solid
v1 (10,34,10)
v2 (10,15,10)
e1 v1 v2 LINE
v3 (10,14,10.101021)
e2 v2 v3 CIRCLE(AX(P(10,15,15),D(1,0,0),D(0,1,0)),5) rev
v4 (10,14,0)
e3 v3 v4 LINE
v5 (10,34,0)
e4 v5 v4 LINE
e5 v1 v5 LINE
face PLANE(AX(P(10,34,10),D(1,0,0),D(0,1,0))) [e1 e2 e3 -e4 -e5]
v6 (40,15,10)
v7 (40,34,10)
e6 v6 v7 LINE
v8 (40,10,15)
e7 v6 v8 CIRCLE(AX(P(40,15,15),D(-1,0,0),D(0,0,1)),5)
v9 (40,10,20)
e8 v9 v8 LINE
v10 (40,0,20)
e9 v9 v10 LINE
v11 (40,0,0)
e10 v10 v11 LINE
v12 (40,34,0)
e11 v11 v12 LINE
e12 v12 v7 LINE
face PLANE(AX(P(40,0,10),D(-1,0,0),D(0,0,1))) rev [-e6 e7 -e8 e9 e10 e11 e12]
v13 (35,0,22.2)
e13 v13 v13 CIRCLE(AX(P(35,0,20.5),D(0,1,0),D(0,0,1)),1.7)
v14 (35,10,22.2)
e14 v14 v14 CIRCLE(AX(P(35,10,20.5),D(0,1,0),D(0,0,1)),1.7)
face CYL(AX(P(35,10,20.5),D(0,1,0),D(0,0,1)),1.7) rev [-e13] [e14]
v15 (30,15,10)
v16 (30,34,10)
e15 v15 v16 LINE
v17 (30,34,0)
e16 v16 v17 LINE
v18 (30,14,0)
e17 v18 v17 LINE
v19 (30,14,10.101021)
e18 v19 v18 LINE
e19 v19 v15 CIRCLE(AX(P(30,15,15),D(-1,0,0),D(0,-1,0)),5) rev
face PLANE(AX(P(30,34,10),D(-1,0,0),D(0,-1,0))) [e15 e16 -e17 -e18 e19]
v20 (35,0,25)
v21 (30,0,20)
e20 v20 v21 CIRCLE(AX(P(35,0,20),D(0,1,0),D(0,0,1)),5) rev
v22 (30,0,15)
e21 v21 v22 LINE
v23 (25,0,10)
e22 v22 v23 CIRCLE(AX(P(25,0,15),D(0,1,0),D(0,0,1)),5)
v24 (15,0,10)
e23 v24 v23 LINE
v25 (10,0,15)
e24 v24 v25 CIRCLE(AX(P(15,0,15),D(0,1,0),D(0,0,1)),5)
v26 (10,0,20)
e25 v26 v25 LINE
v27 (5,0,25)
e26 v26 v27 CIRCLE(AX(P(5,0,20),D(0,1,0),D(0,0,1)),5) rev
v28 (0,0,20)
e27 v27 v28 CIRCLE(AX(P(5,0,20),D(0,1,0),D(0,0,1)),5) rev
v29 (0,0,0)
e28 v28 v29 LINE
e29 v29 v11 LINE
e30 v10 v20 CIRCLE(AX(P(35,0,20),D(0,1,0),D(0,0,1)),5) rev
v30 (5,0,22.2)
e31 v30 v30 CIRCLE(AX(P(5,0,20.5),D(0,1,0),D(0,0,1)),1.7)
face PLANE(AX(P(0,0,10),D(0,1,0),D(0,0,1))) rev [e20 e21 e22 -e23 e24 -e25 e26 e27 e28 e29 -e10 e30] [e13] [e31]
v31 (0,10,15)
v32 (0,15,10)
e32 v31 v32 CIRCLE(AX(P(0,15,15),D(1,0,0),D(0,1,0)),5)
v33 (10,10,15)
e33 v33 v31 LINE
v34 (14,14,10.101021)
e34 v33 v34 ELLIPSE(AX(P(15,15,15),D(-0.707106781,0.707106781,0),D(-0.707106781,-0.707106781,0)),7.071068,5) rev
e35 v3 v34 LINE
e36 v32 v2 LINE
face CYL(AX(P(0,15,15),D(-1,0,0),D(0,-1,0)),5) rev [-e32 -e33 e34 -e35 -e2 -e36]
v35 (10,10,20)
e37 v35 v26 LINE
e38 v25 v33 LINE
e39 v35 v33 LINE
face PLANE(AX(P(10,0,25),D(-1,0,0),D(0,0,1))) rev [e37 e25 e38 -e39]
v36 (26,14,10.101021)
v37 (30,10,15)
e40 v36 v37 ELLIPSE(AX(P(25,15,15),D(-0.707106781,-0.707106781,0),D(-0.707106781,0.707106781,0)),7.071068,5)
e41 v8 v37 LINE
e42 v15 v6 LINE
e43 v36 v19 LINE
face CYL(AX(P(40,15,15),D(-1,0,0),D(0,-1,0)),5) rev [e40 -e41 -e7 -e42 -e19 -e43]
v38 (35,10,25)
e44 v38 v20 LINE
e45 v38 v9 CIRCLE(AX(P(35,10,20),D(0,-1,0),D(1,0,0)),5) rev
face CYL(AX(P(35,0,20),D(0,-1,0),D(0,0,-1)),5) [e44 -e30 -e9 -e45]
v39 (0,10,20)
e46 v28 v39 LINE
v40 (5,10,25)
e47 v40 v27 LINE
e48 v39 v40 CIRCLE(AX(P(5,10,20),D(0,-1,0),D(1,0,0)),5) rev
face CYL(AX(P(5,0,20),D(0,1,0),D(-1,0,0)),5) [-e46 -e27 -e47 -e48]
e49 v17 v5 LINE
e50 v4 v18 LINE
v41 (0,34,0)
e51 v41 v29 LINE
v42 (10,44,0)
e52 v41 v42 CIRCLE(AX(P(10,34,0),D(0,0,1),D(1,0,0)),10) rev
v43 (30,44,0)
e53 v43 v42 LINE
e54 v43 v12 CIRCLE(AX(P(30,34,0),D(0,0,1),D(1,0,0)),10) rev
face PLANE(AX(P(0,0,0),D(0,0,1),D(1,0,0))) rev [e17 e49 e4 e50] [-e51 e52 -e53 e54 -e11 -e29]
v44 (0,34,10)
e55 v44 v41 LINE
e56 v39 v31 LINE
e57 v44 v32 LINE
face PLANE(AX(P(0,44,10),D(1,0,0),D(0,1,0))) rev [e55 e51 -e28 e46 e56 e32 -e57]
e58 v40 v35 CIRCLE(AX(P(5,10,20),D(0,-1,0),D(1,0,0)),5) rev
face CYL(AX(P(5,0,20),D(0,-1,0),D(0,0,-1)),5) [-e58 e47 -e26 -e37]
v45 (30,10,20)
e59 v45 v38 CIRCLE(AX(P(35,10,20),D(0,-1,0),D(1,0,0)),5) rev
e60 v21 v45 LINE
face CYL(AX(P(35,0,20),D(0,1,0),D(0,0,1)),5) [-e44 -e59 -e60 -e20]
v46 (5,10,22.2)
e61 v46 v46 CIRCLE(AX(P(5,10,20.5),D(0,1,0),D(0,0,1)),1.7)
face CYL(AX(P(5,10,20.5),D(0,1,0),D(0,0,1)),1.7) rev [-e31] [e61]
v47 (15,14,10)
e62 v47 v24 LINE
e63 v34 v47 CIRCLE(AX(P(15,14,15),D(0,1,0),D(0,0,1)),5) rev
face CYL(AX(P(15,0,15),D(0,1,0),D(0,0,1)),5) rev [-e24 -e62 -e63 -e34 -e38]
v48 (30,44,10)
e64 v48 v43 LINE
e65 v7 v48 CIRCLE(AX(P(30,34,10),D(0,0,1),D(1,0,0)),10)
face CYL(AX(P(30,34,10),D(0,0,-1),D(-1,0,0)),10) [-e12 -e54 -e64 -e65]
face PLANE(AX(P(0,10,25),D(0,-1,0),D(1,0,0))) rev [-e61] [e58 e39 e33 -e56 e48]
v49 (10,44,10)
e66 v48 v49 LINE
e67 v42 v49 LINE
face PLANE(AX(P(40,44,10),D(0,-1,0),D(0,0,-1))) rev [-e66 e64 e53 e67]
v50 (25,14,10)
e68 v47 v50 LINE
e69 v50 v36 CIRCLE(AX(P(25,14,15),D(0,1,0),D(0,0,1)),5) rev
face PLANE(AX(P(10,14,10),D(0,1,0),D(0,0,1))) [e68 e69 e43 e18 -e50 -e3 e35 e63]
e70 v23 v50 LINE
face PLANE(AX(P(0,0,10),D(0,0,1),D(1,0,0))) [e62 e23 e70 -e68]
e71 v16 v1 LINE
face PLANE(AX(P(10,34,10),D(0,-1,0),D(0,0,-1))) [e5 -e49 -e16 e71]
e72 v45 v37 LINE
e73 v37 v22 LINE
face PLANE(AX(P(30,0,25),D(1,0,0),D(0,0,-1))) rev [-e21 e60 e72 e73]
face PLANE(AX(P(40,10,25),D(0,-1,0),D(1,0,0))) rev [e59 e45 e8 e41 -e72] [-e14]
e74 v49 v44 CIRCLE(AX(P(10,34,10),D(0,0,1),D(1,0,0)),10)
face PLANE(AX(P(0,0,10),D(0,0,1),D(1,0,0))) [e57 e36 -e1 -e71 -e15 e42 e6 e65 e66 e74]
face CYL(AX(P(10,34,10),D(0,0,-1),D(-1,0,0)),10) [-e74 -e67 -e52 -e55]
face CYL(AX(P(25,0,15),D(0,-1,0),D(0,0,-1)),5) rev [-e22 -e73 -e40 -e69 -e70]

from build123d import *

# Parameters (mm, degrees)
ESQUISSE1_W        = 40
ESQUISSE1_H        = 44
ESQUISSE1_W_2      = 20
ESQUISSE1_H_2      = 20
BOSS_EXTRU_1_DEPTH = 10
ESQUISSE3_W        = 10
ESQUISSE3_H        = 10
BOSS_EXTRU_2_DEPTH = 15
D_GAGEMENT_M31_D   = 3.4
CONG_2_R           = 10
CONG_3_R           = 5


with BuildPart() as part:
    # Esquisse1 → Boss.-Extru.1 (new body)
    with BuildSketch(Plane.XY):
        with Locations((20, 22)):
            Rectangle(ESQUISSE1_W, ESQUISSE1_H)
        with Locations((20, 24)):
            Rectangle(ESQUISSE1_W_2, ESQUISSE1_H_2, mode=Mode.SUBTRACT)
    extrude(amount=BOSS_EXTRU_1_DEPTH)

    # Esquisse3 → Boss.-Extru.2 (add)
    with BuildSketch(Plane.XY.offset(10)):
        with Locations((35, 5)):
            Rectangle(ESQUISSE3_W, ESQUISSE3_H)
        with Locations((5, 5)):
            Rectangle(ESQUISSE3_W, ESQUISSE3_H)
    extrude(amount=BOSS_EXTRU_2_DEPTH)

    # Dégagement M31 (through all)
    with Locations(Plane(origin=(0, 10, 0), x_dir=(1, 0, 0), z_dir=(0, 1, 0))):
        with Locations((5, -20.5), (35, -20.5)):
            Hole(D_GAGEMENT_M31_D / 2)

    # Congé2
    cong_2_edges = [part.edges().sort_by_distance(p)[0] for p in [
        (0, 44, 5),
        (40, 44, 5),
    ]]
    fillet(cong_2_edges, radius=CONG_2_R)

    # Congé3
    # the kernel refuses this fillet: 5 mm, written as the material it adds along each edge
    with BuildSketch(Plane(origin=(40, 10, 10), x_dir=(0, 1, 0), z_dir=(-1, 0, 0)), Plane(origin=(30, 10, 10), x_dir=(-1, 0, 0), z_dir=(0, -1, 0))) as cong_3_piece_1:
        with BuildLine():
            CenterArc((CONG_3_R, -CONG_3_R), CONG_3_R, 90, 90)
            Line((0, -CONG_3_R), (0, 0))
            Line((0, 0), (CONG_3_R, 0))
        make_face()
    extrude(amount=10)
    with BuildSketch(Plane(origin=(0, 10, 10), x_dir=(0, 1, 0), z_dir=(1, 0, 0)), Plane(origin=(10, 10, 10), x_dir=(1, 0, 0), z_dir=(0, -1, 0))) as cong_3_piece_2:
        with BuildLine():
            CenterArc((CONG_3_R, CONG_3_R), CONG_3_R, 180, 90)
            Line((0, CONG_3_R), (0, 0))
            Line((0, 0), (CONG_3_R, 0))
        make_face()
    extrude(amount=10)
    with BuildSketch(Plane(origin=(30, 22.5, 10), x_dir=(-1, 0, 0), z_dir=(0, -1, 0))) as cong_3_piece_3a_section:
        with BuildLine():
            CenterArc((CONG_3_R, -CONG_3_R), CONG_3_R, 90, 90)
            Line((0, -CONG_3_R), (0, 0))
            Line((0, 0), (CONG_3_R, 0))
        make_face()
    cong_3_piece_3a = extrude(amount=22.5, mode=Mode.PRIVATE)
    cong_3_piece_3a = split(cong_3_piece_3a, bisect_by=Plane(origin=(28.868024429, 14, 11.131975571), z_dir=(0, -1, 0)), keep=Keep.TOP, mode=Mode.PRIVATE)
    cong_3_piece_3a = split(cong_3_piece_3a, bisect_by=Plane(origin=(28.868024429, 10, 11.131975571), z_dir=(0, 1, 0)), keep=Keep.TOP, mode=Mode.PRIVATE)
    with BuildSketch(Plane(origin=(40, 10, 10), x_dir=(0, 1, 0), z_dir=(-1, 0, 0))) as cong_3_piece_3b_section:
        with BuildLine():
            CenterArc((CONG_3_R, -CONG_3_R), CONG_3_R, 90, 90)
            Line((0, -CONG_3_R), (0, 0))
            Line((0, 0), (CONG_3_R, 0))
        make_face()
    cong_3_piece_3b = extrude(amount=22.5, mode=Mode.PRIVATE)
    cong_3_piece_3b = split(cong_3_piece_3b, bisect_by=Plane(origin=(30, 11.061263152, 11.15683257), z_dir=(-1, 0, 0)), keep=Keep.TOP, mode=Mode.PRIVATE)
    cong_3_piece_3b = split(cong_3_piece_3b, bisect_by=Plane(origin=(23.75, 14, 11.15683257), z_dir=(0, -1, 0)), keep=Keep.TOP, mode=Mode.PRIVATE)
    cong_3_piece_3 = cong_3_piece_3a & cong_3_piece_3b
    add(cong_3_piece_3)
    with BuildSketch(Plane(origin=(0, 10, 10), x_dir=(0, 1, 0), z_dir=(1, 0, 0))) as cong_3_piece_4a_section:
        with BuildLine():
            CenterArc((CONG_3_R, CONG_3_R), CONG_3_R, 180, 90)
            Line((0, CONG_3_R), (0, 0))
            Line((0, 0), (CONG_3_R, 0))
        make_face()
    cong_3_piece_4a = extrude(amount=22.5, mode=Mode.PRIVATE)
    cong_3_piece_4a = split(cong_3_piece_4a, bisect_by=Plane(origin=(10, 11.061263152, 11.15683257), z_dir=(1, 0, 0)), keep=Keep.TOP, mode=Mode.PRIVATE)
    cong_3_piece_4a = split(cong_3_piece_4a, bisect_by=Plane(origin=(16.25, 14, 11.15683257), z_dir=(0, -1, 0)), keep=Keep.TOP, mode=Mode.PRIVATE)
    with BuildSketch(Plane(origin=(10, 22.5, 10), x_dir=(1, 0, 0), z_dir=(0, -1, 0))) as cong_3_piece_4b_section:
        with BuildLine():
            CenterArc((CONG_3_R, CONG_3_R), CONG_3_R, 180, 90)
            Line((0, CONG_3_R), (0, 0))
            Line((0, 0), (CONG_3_R, 0))
        make_face()
    cong_3_piece_4b = extrude(amount=22.5, mode=Mode.PRIVATE)
    cong_3_piece_4b = split(cong_3_piece_4b, bisect_by=Plane(origin=(11.131975571, 14, 11.131975571), z_dir=(0, -1, 0)), keep=Keep.TOP, mode=Mode.PRIVATE)
    cong_3_piece_4b = split(cong_3_piece_4b, bisect_by=Plane(origin=(11.131975571, 10, 11.131975571), z_dir=(0, 1, 0)), keep=Keep.TOP, mode=Mode.PRIVATE)
    cong_3_piece_4 = cong_3_piece_4a & cong_3_piece_4b
    add(cong_3_piece_4)
    # the kernel refuses this fillet: 5 mm, written as the material it takes off along each edge
    with BuildSketch(Plane(origin=(40, -12.5, 25), x_dir=(0, 0, -1), z_dir=(0, 1, 0)), Plane(origin=(30, 22.5, 25), x_dir=(0, 0, -1), z_dir=(0, -1, 0))) as cong_3_2_piece_1:
        with BuildLine():
            CenterArc((CONG_3_R, CONG_3_R), CONG_3_R, 180, 90)
            Line((0, CONG_3_R), (0, 0))
            Line((0, 0), (CONG_3_R, 0))
        make_face()
    extrude(amount=35, mode=Mode.SUBTRACT)
    with BuildSketch(Plane(origin=(10, 22.5, 25), x_dir=(0, 0, -1), z_dir=(0, -1, 0)), Plane(origin=(0, -12.5, 25), x_dir=(0, 0, -1), z_dir=(0, 1, 0))) as cong_3_2_piece_2:
        with BuildLine():
            CenterArc((CONG_3_R, -CONG_3_R), CONG_3_R, 90, 90)
            Line((0, -CONG_3_R), (0, 0))
            Line((0, 0), (CONG_3_R, 0))
        make_face()
    extrude(amount=35, mode=Mode.SUBTRACT)


solid = part.part
